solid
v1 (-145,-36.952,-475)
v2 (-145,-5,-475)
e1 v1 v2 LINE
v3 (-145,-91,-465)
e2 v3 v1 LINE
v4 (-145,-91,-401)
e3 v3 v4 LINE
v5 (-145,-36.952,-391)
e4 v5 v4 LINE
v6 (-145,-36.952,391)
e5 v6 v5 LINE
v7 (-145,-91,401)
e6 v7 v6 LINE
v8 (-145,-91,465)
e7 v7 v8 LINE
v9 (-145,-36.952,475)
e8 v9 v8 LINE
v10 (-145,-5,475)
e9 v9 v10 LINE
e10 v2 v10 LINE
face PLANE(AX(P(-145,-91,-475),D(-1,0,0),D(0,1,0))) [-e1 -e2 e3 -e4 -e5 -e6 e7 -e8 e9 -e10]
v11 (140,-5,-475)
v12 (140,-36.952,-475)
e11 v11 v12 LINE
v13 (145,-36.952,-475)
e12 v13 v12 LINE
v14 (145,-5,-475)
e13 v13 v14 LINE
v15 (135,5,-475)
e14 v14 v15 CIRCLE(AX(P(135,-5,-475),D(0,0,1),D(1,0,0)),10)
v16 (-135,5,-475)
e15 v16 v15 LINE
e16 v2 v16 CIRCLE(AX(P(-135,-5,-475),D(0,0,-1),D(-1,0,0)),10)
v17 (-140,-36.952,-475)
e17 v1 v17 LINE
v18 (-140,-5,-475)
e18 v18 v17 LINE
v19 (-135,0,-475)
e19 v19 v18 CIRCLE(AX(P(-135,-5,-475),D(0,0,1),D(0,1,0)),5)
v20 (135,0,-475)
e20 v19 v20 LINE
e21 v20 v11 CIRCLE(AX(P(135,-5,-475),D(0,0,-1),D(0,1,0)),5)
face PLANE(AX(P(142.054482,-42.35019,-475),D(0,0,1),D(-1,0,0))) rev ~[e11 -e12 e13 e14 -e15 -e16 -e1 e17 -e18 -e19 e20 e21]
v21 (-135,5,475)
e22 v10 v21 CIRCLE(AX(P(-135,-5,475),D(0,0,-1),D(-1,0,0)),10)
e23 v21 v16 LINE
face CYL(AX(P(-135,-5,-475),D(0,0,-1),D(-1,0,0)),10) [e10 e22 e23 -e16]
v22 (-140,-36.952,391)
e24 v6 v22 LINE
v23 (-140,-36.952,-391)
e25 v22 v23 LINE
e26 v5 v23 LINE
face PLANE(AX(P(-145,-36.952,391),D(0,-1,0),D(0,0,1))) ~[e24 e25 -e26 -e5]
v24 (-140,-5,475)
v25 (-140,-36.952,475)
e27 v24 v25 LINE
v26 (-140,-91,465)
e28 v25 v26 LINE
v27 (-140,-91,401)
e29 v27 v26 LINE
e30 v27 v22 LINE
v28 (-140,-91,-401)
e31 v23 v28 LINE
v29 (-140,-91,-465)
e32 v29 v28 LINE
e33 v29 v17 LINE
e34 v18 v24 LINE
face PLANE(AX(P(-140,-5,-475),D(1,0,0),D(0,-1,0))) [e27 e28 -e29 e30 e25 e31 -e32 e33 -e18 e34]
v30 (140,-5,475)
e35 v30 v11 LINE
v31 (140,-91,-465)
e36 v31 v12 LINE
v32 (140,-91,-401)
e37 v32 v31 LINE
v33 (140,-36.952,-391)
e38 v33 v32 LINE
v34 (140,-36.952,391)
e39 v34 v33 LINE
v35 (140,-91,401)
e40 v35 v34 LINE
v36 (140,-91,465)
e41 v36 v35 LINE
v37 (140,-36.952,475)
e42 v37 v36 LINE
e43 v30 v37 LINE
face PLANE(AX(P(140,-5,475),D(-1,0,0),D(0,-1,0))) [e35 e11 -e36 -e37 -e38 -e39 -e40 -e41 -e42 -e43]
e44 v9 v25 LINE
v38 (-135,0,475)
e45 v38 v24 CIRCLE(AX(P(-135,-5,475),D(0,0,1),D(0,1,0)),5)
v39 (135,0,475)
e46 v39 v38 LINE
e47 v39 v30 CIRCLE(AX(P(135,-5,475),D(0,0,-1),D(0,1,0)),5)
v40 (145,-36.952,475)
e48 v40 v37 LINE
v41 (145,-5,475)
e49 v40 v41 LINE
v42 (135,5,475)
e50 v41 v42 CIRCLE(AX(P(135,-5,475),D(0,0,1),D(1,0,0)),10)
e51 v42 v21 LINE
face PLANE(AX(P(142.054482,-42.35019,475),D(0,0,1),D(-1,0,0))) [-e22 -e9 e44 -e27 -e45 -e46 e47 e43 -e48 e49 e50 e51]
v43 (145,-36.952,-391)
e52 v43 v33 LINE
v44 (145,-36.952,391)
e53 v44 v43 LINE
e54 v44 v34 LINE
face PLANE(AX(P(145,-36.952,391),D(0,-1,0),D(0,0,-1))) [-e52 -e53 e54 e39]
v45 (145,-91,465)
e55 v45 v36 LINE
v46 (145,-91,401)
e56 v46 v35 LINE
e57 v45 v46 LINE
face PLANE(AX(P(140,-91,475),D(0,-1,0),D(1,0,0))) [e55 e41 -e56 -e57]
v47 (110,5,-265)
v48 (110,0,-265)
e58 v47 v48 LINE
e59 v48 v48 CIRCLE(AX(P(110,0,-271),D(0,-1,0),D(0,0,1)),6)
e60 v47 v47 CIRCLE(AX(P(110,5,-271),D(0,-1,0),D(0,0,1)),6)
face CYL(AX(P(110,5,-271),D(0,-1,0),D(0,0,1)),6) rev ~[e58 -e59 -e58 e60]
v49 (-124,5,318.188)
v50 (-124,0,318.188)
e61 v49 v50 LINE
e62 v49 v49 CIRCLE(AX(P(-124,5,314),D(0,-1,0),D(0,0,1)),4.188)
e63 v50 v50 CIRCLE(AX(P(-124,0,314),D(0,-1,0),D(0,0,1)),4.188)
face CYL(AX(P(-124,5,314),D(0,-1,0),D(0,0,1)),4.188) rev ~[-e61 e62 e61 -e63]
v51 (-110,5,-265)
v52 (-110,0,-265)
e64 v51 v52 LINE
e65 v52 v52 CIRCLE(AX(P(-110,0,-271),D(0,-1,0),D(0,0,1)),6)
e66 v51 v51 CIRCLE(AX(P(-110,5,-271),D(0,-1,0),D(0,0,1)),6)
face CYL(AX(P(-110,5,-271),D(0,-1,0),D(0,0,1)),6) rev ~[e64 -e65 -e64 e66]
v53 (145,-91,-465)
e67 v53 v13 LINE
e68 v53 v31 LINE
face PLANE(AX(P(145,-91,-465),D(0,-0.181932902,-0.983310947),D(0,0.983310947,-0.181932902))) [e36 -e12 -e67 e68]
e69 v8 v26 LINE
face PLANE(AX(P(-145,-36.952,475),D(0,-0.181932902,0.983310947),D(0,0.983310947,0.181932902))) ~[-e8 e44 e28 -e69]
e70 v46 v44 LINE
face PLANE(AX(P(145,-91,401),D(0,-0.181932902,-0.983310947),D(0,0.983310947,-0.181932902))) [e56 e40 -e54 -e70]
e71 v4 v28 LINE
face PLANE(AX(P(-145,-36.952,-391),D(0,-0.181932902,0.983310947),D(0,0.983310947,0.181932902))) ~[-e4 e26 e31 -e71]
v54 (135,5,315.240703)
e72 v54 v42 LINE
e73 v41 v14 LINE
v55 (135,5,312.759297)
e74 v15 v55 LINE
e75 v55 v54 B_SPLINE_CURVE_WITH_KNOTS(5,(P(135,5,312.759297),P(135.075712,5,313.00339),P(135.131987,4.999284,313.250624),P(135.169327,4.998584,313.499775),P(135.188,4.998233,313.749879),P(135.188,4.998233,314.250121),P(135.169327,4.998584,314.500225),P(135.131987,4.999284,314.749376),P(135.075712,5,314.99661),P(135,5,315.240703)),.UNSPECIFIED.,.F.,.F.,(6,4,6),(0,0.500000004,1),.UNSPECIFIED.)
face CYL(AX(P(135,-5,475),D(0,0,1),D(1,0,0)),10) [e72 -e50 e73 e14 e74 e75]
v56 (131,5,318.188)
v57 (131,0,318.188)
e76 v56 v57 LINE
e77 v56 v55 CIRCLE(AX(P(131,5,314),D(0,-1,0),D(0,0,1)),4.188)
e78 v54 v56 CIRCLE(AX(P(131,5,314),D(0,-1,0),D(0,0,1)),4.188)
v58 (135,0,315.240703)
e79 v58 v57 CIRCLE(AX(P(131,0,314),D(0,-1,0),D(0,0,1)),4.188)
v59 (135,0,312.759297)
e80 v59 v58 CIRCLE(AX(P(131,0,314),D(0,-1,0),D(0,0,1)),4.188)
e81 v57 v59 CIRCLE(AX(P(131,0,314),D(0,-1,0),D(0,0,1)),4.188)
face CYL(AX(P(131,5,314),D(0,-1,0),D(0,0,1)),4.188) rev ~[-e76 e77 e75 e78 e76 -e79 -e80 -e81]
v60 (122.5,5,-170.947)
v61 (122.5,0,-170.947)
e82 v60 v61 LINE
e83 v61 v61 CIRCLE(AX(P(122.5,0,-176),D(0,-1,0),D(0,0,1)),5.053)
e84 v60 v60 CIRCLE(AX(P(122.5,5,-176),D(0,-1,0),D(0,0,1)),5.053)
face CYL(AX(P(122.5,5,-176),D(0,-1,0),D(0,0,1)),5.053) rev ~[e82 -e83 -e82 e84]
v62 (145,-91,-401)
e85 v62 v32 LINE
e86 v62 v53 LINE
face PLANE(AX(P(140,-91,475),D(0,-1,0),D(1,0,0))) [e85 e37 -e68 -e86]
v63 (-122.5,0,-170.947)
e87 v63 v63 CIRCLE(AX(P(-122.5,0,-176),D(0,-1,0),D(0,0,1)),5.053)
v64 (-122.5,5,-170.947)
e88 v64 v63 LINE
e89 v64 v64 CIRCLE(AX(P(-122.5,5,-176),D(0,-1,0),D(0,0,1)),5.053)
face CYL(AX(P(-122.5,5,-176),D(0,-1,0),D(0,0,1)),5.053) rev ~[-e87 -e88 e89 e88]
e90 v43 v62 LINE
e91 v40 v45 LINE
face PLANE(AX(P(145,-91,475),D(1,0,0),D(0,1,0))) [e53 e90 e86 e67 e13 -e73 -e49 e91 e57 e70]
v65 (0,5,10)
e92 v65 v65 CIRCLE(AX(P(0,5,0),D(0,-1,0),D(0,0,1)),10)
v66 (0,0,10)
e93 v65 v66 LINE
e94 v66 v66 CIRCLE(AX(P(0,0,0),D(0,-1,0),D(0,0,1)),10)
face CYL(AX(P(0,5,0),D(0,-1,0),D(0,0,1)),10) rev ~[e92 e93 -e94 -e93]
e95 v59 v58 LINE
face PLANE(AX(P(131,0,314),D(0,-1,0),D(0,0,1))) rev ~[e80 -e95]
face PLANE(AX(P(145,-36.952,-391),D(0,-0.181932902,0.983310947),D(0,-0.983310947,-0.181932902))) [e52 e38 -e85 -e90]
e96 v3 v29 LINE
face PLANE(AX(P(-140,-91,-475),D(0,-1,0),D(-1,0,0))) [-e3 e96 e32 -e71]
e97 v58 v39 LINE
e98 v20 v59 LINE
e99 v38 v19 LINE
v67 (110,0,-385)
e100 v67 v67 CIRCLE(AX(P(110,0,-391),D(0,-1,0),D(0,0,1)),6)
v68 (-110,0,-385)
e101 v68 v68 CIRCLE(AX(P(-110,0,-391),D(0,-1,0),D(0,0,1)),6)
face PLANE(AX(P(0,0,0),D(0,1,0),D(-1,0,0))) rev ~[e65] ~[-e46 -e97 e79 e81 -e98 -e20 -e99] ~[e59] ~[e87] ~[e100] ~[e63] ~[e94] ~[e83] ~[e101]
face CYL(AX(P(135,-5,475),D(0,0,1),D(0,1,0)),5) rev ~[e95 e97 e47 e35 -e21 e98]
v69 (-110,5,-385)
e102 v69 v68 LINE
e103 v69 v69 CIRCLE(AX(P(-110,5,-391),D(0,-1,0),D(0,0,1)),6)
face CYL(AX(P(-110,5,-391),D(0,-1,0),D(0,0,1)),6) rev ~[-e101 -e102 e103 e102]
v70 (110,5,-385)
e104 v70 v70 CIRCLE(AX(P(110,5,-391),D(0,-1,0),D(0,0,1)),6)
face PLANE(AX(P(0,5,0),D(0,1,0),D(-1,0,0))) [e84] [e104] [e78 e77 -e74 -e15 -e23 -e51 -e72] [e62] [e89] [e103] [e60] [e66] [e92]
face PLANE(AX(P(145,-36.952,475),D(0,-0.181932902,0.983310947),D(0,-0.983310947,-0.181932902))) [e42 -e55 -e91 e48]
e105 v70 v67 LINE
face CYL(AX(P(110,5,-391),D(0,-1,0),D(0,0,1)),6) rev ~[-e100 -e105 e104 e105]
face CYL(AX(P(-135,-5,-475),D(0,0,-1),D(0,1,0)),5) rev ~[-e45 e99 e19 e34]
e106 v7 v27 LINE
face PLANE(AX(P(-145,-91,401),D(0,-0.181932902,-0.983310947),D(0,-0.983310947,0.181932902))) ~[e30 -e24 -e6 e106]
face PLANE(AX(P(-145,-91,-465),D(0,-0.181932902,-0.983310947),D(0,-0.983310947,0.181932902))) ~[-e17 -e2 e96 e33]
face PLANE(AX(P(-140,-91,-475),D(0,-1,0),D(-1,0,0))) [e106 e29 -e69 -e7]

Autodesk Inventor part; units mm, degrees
ref_plane "XZ Plane" through (0, 0, 0) normal (0, 1, 0) x (-1, 0, 0)
ref_plane "XY Plane" through (0, 0, 0) normal (0, 0, 1) x (1, 0, 0)
sketch "Skizze1" plane through (0, 0, 0) normal (0, 1, 0) x (-1, 0, 0)
  line L0 (-140, 475) -> (140, 475)
  line L1 (140, 475) -> (140, -475)
  line L2 (140, -475) -> (-140, -475)
  line L3 (-140, -475) -> (-140, 475)
  line L4 (-140, 475) -> (140, -475) construction
  line L5 (140, 475) -> (-140, -475) construction
  point P0 (0, 0)
  dimension "d0" = 950
  dimension "d1" = 280
extrude "Grobblech4" add sketch "Skizze1" along normal blind 5
sketch "Skizze2" plane through (140, 0, 475) normal (1, 0, 0) x (0, 1, 0)
  line L0 (0, -950) -> (0, 0)
  line L1 (0, 0) -> (-91, 0)
  line L2 (-91, 0) -> (-91, -950)
  line L3 (-91, -950) -> (0, -950)
edge flange "Lasche1" height 96 angle 90 thickness 5 bend radius 5 thickness toward (1, 0, 0) relief tear relief width 5 relief depth 2.5 corner gap 5 corner form 0 edges at (140, 0, 0) (-140, 0, 0) wall of the first edge with corners at (140, 0, -475) (140, 0, 475) (140, -91, 475) (140, -91, -475)
bend "Biegung1"
corner "Ecke1"
sketch "Skizze3" plane through (145, -92.952, 475) normal (1, 0, 0) x (0, 0, -1)
  line L0 (0, 56) -> (10, 1.952)
  line L1 (74, 1.952) -> (84, 56)
  line L2 (84, 56) -> (866, 56)
  line L3 (866, 56) -> (876, 1.952)
  line L4 (876, 1.952) -> (940, 1.952)
  line L5 (940, 1.952) -> (950, 56)
  line L6 (10, 1.952) -> (74, 1.952)
  line L7 (950, 87.952) -> (0, 87.952) projected
  line L8 (0, 1.952) -> (0, 87.952) projected
  line L9 (950, 1.952) -> (0, 1.952) projected
  line L10 (950, 87.952) -> (950, 1.952) projected
  line L11 (950, 1.952) -> (0, 1.952) projected
  point P0 (475, 92.952)
  point P1 (42, 1.952)
  point P2 (908, 1.952)
  point P3 (950, 56)
  point P4 (940, 1.952)
  point P5 (74, 1.952)
  point P6 (876, 1.952)
  point P7 (10, 1.952)
  point P8 (0, 56)
  dimension "d15" = 10
  dimension "d16" = 64
  dimension "d17" = 10
  dimension "d18" = 10
  dimension "d19" = 64
  dimension "d22" = 54.048
extrude "Extrusion2" cut sketch "Skizze3" against normal up to surface (5 mm away) contours L0 L9 L8 | L1 L2 L3 L9 | L10 L9 L5
ref_plane "Arbeitsebene1" through (0, 0, 0) normal (1, 0, 0) x (0, 1, 0)
mirror "Spiegeln1" about plane through (0, 0, 0) normal (1, 0, 0) of "Extrusion2"
sketch "Skizze4" plane through (0, 5, 0) normal (0, 1, 0) x (1, 0, 0)
  line L0 (-135, 475) -> (135, 475) projected
  point P0 (110, 391)
  point P1 (-110, 391)
  point P2 (0, 0)
  dimension "d34" = 220
  dimension "d76" = 84
  dimension "d77" = 110
hole "Bohrung1" at (110, 5, -391) at (-110, 5, -391) direction (0, -1, 0) diameter 12 depth 5
sketch "Skizze5" plane through (0, 5, 0) normal (0, 1, 0) x (1, 0, 0)
  circle A0 centre (-110, 391) radius 6 projected
  point P0 (110, 271)
  point P1 (-110, 271)
  point P2 (110, 391)
  point P3 (0, 0)
  dimension "d43" = 120
hole "Bohrung2" at (110, 5, -271) at (-110, 5, -271) direction (0, -1, 0) diameter 12 end through all
sketch "Skizze6" plane through (0, 5, 0) normal (0, 1, 0) x (1, 0, 0)
  circle A0 centre (110, 271) radius 6 projected
  point P0 (122.5, 176)
  point P1 (-122.5, 176)
  point P2 (0, 0)
  dimension "d55" = 245
  dimension "d88" = 122.5
  dimension "d89" = 95
hole "Bohrung3" at (122.5, 5, -176) at (-122.5, 5, -176) direction (0, -1, 0) diameter 10.106 end through all thread size "M12x1.75" class "6H" standard "ISO Metric profile"
sketch "Skizze7" plane through (0, 5, 0) normal (0, 1, 0) x (1, 0, 0)
  line L0 (145, 475) -> (145, -475) projected
  line L1 (0, 0) -> (0, -582.3396) construction
  point P0 (131, -314)
  point P1 (-124, -314)
  dimension "d73" = 255
  dimension "d79" = 14
  dimension "d80" = 314
hole "Bohrung5" at (131, 5, 314) at (-124, 5, 314) direction (0, -1, 0) diameter 8.376 depth 5 thread size "M10x1.5" class "6H" standard "ISO Metric profile"
sketch "Skizze8" plane through (0, 5, 0) normal (0, 1, 0) x (1, 0, 0)
  point P0 (0, 0)
  point P1 (0, 0)
hole "Bohrung6" at (0, 5, 0) direction (0, -1, 0) diameter 20 depth 5
equation "\"d31\" = Stärke"
equation "\"d88\" = 0.5 * d55"
equation "\"d64\" = d72"
equation "\"d82\" = d72"
equation "\"d2\" = Stärke"
equation "\"d3\" = BreiteBiegungsfreistellung"
equation "\"d4\" = TiefeBiegungsfreistellung"
equation "\"d5\" = MinimalRest"
equation "\"d6\" = Übergangsradius"
equation "\"d9\" = Biegeradius"
equation "\"d10\" = GrößeEckenfreistellung"
equation "\"d11\" = Abstandsgröße"
equation "\"d12\" = JacobiRadiusGröße"
equation "\"Biegeradius\" = Stärke"
equation "\"BreiteBiegungsfreistellung\" = Stärke"
equation "\"TiefeBiegungsfreistellung\" = 0.5 * Stärke"
equation "\"Übergangsradius\" = Biegeradius"
equation "\"JacobiRadiusGröße\" = Biegeradius"
equation "\"Abstandsgröße\" = Stärke"
equation "\"Stärke\" = 5"
equation "\"d72\" = 107"
equation "\"MinimalRest\" = 10"
equation "\"GrößeEckenfreistellung\" = 20"
properties part number "9" material "Aluminium 6061"
